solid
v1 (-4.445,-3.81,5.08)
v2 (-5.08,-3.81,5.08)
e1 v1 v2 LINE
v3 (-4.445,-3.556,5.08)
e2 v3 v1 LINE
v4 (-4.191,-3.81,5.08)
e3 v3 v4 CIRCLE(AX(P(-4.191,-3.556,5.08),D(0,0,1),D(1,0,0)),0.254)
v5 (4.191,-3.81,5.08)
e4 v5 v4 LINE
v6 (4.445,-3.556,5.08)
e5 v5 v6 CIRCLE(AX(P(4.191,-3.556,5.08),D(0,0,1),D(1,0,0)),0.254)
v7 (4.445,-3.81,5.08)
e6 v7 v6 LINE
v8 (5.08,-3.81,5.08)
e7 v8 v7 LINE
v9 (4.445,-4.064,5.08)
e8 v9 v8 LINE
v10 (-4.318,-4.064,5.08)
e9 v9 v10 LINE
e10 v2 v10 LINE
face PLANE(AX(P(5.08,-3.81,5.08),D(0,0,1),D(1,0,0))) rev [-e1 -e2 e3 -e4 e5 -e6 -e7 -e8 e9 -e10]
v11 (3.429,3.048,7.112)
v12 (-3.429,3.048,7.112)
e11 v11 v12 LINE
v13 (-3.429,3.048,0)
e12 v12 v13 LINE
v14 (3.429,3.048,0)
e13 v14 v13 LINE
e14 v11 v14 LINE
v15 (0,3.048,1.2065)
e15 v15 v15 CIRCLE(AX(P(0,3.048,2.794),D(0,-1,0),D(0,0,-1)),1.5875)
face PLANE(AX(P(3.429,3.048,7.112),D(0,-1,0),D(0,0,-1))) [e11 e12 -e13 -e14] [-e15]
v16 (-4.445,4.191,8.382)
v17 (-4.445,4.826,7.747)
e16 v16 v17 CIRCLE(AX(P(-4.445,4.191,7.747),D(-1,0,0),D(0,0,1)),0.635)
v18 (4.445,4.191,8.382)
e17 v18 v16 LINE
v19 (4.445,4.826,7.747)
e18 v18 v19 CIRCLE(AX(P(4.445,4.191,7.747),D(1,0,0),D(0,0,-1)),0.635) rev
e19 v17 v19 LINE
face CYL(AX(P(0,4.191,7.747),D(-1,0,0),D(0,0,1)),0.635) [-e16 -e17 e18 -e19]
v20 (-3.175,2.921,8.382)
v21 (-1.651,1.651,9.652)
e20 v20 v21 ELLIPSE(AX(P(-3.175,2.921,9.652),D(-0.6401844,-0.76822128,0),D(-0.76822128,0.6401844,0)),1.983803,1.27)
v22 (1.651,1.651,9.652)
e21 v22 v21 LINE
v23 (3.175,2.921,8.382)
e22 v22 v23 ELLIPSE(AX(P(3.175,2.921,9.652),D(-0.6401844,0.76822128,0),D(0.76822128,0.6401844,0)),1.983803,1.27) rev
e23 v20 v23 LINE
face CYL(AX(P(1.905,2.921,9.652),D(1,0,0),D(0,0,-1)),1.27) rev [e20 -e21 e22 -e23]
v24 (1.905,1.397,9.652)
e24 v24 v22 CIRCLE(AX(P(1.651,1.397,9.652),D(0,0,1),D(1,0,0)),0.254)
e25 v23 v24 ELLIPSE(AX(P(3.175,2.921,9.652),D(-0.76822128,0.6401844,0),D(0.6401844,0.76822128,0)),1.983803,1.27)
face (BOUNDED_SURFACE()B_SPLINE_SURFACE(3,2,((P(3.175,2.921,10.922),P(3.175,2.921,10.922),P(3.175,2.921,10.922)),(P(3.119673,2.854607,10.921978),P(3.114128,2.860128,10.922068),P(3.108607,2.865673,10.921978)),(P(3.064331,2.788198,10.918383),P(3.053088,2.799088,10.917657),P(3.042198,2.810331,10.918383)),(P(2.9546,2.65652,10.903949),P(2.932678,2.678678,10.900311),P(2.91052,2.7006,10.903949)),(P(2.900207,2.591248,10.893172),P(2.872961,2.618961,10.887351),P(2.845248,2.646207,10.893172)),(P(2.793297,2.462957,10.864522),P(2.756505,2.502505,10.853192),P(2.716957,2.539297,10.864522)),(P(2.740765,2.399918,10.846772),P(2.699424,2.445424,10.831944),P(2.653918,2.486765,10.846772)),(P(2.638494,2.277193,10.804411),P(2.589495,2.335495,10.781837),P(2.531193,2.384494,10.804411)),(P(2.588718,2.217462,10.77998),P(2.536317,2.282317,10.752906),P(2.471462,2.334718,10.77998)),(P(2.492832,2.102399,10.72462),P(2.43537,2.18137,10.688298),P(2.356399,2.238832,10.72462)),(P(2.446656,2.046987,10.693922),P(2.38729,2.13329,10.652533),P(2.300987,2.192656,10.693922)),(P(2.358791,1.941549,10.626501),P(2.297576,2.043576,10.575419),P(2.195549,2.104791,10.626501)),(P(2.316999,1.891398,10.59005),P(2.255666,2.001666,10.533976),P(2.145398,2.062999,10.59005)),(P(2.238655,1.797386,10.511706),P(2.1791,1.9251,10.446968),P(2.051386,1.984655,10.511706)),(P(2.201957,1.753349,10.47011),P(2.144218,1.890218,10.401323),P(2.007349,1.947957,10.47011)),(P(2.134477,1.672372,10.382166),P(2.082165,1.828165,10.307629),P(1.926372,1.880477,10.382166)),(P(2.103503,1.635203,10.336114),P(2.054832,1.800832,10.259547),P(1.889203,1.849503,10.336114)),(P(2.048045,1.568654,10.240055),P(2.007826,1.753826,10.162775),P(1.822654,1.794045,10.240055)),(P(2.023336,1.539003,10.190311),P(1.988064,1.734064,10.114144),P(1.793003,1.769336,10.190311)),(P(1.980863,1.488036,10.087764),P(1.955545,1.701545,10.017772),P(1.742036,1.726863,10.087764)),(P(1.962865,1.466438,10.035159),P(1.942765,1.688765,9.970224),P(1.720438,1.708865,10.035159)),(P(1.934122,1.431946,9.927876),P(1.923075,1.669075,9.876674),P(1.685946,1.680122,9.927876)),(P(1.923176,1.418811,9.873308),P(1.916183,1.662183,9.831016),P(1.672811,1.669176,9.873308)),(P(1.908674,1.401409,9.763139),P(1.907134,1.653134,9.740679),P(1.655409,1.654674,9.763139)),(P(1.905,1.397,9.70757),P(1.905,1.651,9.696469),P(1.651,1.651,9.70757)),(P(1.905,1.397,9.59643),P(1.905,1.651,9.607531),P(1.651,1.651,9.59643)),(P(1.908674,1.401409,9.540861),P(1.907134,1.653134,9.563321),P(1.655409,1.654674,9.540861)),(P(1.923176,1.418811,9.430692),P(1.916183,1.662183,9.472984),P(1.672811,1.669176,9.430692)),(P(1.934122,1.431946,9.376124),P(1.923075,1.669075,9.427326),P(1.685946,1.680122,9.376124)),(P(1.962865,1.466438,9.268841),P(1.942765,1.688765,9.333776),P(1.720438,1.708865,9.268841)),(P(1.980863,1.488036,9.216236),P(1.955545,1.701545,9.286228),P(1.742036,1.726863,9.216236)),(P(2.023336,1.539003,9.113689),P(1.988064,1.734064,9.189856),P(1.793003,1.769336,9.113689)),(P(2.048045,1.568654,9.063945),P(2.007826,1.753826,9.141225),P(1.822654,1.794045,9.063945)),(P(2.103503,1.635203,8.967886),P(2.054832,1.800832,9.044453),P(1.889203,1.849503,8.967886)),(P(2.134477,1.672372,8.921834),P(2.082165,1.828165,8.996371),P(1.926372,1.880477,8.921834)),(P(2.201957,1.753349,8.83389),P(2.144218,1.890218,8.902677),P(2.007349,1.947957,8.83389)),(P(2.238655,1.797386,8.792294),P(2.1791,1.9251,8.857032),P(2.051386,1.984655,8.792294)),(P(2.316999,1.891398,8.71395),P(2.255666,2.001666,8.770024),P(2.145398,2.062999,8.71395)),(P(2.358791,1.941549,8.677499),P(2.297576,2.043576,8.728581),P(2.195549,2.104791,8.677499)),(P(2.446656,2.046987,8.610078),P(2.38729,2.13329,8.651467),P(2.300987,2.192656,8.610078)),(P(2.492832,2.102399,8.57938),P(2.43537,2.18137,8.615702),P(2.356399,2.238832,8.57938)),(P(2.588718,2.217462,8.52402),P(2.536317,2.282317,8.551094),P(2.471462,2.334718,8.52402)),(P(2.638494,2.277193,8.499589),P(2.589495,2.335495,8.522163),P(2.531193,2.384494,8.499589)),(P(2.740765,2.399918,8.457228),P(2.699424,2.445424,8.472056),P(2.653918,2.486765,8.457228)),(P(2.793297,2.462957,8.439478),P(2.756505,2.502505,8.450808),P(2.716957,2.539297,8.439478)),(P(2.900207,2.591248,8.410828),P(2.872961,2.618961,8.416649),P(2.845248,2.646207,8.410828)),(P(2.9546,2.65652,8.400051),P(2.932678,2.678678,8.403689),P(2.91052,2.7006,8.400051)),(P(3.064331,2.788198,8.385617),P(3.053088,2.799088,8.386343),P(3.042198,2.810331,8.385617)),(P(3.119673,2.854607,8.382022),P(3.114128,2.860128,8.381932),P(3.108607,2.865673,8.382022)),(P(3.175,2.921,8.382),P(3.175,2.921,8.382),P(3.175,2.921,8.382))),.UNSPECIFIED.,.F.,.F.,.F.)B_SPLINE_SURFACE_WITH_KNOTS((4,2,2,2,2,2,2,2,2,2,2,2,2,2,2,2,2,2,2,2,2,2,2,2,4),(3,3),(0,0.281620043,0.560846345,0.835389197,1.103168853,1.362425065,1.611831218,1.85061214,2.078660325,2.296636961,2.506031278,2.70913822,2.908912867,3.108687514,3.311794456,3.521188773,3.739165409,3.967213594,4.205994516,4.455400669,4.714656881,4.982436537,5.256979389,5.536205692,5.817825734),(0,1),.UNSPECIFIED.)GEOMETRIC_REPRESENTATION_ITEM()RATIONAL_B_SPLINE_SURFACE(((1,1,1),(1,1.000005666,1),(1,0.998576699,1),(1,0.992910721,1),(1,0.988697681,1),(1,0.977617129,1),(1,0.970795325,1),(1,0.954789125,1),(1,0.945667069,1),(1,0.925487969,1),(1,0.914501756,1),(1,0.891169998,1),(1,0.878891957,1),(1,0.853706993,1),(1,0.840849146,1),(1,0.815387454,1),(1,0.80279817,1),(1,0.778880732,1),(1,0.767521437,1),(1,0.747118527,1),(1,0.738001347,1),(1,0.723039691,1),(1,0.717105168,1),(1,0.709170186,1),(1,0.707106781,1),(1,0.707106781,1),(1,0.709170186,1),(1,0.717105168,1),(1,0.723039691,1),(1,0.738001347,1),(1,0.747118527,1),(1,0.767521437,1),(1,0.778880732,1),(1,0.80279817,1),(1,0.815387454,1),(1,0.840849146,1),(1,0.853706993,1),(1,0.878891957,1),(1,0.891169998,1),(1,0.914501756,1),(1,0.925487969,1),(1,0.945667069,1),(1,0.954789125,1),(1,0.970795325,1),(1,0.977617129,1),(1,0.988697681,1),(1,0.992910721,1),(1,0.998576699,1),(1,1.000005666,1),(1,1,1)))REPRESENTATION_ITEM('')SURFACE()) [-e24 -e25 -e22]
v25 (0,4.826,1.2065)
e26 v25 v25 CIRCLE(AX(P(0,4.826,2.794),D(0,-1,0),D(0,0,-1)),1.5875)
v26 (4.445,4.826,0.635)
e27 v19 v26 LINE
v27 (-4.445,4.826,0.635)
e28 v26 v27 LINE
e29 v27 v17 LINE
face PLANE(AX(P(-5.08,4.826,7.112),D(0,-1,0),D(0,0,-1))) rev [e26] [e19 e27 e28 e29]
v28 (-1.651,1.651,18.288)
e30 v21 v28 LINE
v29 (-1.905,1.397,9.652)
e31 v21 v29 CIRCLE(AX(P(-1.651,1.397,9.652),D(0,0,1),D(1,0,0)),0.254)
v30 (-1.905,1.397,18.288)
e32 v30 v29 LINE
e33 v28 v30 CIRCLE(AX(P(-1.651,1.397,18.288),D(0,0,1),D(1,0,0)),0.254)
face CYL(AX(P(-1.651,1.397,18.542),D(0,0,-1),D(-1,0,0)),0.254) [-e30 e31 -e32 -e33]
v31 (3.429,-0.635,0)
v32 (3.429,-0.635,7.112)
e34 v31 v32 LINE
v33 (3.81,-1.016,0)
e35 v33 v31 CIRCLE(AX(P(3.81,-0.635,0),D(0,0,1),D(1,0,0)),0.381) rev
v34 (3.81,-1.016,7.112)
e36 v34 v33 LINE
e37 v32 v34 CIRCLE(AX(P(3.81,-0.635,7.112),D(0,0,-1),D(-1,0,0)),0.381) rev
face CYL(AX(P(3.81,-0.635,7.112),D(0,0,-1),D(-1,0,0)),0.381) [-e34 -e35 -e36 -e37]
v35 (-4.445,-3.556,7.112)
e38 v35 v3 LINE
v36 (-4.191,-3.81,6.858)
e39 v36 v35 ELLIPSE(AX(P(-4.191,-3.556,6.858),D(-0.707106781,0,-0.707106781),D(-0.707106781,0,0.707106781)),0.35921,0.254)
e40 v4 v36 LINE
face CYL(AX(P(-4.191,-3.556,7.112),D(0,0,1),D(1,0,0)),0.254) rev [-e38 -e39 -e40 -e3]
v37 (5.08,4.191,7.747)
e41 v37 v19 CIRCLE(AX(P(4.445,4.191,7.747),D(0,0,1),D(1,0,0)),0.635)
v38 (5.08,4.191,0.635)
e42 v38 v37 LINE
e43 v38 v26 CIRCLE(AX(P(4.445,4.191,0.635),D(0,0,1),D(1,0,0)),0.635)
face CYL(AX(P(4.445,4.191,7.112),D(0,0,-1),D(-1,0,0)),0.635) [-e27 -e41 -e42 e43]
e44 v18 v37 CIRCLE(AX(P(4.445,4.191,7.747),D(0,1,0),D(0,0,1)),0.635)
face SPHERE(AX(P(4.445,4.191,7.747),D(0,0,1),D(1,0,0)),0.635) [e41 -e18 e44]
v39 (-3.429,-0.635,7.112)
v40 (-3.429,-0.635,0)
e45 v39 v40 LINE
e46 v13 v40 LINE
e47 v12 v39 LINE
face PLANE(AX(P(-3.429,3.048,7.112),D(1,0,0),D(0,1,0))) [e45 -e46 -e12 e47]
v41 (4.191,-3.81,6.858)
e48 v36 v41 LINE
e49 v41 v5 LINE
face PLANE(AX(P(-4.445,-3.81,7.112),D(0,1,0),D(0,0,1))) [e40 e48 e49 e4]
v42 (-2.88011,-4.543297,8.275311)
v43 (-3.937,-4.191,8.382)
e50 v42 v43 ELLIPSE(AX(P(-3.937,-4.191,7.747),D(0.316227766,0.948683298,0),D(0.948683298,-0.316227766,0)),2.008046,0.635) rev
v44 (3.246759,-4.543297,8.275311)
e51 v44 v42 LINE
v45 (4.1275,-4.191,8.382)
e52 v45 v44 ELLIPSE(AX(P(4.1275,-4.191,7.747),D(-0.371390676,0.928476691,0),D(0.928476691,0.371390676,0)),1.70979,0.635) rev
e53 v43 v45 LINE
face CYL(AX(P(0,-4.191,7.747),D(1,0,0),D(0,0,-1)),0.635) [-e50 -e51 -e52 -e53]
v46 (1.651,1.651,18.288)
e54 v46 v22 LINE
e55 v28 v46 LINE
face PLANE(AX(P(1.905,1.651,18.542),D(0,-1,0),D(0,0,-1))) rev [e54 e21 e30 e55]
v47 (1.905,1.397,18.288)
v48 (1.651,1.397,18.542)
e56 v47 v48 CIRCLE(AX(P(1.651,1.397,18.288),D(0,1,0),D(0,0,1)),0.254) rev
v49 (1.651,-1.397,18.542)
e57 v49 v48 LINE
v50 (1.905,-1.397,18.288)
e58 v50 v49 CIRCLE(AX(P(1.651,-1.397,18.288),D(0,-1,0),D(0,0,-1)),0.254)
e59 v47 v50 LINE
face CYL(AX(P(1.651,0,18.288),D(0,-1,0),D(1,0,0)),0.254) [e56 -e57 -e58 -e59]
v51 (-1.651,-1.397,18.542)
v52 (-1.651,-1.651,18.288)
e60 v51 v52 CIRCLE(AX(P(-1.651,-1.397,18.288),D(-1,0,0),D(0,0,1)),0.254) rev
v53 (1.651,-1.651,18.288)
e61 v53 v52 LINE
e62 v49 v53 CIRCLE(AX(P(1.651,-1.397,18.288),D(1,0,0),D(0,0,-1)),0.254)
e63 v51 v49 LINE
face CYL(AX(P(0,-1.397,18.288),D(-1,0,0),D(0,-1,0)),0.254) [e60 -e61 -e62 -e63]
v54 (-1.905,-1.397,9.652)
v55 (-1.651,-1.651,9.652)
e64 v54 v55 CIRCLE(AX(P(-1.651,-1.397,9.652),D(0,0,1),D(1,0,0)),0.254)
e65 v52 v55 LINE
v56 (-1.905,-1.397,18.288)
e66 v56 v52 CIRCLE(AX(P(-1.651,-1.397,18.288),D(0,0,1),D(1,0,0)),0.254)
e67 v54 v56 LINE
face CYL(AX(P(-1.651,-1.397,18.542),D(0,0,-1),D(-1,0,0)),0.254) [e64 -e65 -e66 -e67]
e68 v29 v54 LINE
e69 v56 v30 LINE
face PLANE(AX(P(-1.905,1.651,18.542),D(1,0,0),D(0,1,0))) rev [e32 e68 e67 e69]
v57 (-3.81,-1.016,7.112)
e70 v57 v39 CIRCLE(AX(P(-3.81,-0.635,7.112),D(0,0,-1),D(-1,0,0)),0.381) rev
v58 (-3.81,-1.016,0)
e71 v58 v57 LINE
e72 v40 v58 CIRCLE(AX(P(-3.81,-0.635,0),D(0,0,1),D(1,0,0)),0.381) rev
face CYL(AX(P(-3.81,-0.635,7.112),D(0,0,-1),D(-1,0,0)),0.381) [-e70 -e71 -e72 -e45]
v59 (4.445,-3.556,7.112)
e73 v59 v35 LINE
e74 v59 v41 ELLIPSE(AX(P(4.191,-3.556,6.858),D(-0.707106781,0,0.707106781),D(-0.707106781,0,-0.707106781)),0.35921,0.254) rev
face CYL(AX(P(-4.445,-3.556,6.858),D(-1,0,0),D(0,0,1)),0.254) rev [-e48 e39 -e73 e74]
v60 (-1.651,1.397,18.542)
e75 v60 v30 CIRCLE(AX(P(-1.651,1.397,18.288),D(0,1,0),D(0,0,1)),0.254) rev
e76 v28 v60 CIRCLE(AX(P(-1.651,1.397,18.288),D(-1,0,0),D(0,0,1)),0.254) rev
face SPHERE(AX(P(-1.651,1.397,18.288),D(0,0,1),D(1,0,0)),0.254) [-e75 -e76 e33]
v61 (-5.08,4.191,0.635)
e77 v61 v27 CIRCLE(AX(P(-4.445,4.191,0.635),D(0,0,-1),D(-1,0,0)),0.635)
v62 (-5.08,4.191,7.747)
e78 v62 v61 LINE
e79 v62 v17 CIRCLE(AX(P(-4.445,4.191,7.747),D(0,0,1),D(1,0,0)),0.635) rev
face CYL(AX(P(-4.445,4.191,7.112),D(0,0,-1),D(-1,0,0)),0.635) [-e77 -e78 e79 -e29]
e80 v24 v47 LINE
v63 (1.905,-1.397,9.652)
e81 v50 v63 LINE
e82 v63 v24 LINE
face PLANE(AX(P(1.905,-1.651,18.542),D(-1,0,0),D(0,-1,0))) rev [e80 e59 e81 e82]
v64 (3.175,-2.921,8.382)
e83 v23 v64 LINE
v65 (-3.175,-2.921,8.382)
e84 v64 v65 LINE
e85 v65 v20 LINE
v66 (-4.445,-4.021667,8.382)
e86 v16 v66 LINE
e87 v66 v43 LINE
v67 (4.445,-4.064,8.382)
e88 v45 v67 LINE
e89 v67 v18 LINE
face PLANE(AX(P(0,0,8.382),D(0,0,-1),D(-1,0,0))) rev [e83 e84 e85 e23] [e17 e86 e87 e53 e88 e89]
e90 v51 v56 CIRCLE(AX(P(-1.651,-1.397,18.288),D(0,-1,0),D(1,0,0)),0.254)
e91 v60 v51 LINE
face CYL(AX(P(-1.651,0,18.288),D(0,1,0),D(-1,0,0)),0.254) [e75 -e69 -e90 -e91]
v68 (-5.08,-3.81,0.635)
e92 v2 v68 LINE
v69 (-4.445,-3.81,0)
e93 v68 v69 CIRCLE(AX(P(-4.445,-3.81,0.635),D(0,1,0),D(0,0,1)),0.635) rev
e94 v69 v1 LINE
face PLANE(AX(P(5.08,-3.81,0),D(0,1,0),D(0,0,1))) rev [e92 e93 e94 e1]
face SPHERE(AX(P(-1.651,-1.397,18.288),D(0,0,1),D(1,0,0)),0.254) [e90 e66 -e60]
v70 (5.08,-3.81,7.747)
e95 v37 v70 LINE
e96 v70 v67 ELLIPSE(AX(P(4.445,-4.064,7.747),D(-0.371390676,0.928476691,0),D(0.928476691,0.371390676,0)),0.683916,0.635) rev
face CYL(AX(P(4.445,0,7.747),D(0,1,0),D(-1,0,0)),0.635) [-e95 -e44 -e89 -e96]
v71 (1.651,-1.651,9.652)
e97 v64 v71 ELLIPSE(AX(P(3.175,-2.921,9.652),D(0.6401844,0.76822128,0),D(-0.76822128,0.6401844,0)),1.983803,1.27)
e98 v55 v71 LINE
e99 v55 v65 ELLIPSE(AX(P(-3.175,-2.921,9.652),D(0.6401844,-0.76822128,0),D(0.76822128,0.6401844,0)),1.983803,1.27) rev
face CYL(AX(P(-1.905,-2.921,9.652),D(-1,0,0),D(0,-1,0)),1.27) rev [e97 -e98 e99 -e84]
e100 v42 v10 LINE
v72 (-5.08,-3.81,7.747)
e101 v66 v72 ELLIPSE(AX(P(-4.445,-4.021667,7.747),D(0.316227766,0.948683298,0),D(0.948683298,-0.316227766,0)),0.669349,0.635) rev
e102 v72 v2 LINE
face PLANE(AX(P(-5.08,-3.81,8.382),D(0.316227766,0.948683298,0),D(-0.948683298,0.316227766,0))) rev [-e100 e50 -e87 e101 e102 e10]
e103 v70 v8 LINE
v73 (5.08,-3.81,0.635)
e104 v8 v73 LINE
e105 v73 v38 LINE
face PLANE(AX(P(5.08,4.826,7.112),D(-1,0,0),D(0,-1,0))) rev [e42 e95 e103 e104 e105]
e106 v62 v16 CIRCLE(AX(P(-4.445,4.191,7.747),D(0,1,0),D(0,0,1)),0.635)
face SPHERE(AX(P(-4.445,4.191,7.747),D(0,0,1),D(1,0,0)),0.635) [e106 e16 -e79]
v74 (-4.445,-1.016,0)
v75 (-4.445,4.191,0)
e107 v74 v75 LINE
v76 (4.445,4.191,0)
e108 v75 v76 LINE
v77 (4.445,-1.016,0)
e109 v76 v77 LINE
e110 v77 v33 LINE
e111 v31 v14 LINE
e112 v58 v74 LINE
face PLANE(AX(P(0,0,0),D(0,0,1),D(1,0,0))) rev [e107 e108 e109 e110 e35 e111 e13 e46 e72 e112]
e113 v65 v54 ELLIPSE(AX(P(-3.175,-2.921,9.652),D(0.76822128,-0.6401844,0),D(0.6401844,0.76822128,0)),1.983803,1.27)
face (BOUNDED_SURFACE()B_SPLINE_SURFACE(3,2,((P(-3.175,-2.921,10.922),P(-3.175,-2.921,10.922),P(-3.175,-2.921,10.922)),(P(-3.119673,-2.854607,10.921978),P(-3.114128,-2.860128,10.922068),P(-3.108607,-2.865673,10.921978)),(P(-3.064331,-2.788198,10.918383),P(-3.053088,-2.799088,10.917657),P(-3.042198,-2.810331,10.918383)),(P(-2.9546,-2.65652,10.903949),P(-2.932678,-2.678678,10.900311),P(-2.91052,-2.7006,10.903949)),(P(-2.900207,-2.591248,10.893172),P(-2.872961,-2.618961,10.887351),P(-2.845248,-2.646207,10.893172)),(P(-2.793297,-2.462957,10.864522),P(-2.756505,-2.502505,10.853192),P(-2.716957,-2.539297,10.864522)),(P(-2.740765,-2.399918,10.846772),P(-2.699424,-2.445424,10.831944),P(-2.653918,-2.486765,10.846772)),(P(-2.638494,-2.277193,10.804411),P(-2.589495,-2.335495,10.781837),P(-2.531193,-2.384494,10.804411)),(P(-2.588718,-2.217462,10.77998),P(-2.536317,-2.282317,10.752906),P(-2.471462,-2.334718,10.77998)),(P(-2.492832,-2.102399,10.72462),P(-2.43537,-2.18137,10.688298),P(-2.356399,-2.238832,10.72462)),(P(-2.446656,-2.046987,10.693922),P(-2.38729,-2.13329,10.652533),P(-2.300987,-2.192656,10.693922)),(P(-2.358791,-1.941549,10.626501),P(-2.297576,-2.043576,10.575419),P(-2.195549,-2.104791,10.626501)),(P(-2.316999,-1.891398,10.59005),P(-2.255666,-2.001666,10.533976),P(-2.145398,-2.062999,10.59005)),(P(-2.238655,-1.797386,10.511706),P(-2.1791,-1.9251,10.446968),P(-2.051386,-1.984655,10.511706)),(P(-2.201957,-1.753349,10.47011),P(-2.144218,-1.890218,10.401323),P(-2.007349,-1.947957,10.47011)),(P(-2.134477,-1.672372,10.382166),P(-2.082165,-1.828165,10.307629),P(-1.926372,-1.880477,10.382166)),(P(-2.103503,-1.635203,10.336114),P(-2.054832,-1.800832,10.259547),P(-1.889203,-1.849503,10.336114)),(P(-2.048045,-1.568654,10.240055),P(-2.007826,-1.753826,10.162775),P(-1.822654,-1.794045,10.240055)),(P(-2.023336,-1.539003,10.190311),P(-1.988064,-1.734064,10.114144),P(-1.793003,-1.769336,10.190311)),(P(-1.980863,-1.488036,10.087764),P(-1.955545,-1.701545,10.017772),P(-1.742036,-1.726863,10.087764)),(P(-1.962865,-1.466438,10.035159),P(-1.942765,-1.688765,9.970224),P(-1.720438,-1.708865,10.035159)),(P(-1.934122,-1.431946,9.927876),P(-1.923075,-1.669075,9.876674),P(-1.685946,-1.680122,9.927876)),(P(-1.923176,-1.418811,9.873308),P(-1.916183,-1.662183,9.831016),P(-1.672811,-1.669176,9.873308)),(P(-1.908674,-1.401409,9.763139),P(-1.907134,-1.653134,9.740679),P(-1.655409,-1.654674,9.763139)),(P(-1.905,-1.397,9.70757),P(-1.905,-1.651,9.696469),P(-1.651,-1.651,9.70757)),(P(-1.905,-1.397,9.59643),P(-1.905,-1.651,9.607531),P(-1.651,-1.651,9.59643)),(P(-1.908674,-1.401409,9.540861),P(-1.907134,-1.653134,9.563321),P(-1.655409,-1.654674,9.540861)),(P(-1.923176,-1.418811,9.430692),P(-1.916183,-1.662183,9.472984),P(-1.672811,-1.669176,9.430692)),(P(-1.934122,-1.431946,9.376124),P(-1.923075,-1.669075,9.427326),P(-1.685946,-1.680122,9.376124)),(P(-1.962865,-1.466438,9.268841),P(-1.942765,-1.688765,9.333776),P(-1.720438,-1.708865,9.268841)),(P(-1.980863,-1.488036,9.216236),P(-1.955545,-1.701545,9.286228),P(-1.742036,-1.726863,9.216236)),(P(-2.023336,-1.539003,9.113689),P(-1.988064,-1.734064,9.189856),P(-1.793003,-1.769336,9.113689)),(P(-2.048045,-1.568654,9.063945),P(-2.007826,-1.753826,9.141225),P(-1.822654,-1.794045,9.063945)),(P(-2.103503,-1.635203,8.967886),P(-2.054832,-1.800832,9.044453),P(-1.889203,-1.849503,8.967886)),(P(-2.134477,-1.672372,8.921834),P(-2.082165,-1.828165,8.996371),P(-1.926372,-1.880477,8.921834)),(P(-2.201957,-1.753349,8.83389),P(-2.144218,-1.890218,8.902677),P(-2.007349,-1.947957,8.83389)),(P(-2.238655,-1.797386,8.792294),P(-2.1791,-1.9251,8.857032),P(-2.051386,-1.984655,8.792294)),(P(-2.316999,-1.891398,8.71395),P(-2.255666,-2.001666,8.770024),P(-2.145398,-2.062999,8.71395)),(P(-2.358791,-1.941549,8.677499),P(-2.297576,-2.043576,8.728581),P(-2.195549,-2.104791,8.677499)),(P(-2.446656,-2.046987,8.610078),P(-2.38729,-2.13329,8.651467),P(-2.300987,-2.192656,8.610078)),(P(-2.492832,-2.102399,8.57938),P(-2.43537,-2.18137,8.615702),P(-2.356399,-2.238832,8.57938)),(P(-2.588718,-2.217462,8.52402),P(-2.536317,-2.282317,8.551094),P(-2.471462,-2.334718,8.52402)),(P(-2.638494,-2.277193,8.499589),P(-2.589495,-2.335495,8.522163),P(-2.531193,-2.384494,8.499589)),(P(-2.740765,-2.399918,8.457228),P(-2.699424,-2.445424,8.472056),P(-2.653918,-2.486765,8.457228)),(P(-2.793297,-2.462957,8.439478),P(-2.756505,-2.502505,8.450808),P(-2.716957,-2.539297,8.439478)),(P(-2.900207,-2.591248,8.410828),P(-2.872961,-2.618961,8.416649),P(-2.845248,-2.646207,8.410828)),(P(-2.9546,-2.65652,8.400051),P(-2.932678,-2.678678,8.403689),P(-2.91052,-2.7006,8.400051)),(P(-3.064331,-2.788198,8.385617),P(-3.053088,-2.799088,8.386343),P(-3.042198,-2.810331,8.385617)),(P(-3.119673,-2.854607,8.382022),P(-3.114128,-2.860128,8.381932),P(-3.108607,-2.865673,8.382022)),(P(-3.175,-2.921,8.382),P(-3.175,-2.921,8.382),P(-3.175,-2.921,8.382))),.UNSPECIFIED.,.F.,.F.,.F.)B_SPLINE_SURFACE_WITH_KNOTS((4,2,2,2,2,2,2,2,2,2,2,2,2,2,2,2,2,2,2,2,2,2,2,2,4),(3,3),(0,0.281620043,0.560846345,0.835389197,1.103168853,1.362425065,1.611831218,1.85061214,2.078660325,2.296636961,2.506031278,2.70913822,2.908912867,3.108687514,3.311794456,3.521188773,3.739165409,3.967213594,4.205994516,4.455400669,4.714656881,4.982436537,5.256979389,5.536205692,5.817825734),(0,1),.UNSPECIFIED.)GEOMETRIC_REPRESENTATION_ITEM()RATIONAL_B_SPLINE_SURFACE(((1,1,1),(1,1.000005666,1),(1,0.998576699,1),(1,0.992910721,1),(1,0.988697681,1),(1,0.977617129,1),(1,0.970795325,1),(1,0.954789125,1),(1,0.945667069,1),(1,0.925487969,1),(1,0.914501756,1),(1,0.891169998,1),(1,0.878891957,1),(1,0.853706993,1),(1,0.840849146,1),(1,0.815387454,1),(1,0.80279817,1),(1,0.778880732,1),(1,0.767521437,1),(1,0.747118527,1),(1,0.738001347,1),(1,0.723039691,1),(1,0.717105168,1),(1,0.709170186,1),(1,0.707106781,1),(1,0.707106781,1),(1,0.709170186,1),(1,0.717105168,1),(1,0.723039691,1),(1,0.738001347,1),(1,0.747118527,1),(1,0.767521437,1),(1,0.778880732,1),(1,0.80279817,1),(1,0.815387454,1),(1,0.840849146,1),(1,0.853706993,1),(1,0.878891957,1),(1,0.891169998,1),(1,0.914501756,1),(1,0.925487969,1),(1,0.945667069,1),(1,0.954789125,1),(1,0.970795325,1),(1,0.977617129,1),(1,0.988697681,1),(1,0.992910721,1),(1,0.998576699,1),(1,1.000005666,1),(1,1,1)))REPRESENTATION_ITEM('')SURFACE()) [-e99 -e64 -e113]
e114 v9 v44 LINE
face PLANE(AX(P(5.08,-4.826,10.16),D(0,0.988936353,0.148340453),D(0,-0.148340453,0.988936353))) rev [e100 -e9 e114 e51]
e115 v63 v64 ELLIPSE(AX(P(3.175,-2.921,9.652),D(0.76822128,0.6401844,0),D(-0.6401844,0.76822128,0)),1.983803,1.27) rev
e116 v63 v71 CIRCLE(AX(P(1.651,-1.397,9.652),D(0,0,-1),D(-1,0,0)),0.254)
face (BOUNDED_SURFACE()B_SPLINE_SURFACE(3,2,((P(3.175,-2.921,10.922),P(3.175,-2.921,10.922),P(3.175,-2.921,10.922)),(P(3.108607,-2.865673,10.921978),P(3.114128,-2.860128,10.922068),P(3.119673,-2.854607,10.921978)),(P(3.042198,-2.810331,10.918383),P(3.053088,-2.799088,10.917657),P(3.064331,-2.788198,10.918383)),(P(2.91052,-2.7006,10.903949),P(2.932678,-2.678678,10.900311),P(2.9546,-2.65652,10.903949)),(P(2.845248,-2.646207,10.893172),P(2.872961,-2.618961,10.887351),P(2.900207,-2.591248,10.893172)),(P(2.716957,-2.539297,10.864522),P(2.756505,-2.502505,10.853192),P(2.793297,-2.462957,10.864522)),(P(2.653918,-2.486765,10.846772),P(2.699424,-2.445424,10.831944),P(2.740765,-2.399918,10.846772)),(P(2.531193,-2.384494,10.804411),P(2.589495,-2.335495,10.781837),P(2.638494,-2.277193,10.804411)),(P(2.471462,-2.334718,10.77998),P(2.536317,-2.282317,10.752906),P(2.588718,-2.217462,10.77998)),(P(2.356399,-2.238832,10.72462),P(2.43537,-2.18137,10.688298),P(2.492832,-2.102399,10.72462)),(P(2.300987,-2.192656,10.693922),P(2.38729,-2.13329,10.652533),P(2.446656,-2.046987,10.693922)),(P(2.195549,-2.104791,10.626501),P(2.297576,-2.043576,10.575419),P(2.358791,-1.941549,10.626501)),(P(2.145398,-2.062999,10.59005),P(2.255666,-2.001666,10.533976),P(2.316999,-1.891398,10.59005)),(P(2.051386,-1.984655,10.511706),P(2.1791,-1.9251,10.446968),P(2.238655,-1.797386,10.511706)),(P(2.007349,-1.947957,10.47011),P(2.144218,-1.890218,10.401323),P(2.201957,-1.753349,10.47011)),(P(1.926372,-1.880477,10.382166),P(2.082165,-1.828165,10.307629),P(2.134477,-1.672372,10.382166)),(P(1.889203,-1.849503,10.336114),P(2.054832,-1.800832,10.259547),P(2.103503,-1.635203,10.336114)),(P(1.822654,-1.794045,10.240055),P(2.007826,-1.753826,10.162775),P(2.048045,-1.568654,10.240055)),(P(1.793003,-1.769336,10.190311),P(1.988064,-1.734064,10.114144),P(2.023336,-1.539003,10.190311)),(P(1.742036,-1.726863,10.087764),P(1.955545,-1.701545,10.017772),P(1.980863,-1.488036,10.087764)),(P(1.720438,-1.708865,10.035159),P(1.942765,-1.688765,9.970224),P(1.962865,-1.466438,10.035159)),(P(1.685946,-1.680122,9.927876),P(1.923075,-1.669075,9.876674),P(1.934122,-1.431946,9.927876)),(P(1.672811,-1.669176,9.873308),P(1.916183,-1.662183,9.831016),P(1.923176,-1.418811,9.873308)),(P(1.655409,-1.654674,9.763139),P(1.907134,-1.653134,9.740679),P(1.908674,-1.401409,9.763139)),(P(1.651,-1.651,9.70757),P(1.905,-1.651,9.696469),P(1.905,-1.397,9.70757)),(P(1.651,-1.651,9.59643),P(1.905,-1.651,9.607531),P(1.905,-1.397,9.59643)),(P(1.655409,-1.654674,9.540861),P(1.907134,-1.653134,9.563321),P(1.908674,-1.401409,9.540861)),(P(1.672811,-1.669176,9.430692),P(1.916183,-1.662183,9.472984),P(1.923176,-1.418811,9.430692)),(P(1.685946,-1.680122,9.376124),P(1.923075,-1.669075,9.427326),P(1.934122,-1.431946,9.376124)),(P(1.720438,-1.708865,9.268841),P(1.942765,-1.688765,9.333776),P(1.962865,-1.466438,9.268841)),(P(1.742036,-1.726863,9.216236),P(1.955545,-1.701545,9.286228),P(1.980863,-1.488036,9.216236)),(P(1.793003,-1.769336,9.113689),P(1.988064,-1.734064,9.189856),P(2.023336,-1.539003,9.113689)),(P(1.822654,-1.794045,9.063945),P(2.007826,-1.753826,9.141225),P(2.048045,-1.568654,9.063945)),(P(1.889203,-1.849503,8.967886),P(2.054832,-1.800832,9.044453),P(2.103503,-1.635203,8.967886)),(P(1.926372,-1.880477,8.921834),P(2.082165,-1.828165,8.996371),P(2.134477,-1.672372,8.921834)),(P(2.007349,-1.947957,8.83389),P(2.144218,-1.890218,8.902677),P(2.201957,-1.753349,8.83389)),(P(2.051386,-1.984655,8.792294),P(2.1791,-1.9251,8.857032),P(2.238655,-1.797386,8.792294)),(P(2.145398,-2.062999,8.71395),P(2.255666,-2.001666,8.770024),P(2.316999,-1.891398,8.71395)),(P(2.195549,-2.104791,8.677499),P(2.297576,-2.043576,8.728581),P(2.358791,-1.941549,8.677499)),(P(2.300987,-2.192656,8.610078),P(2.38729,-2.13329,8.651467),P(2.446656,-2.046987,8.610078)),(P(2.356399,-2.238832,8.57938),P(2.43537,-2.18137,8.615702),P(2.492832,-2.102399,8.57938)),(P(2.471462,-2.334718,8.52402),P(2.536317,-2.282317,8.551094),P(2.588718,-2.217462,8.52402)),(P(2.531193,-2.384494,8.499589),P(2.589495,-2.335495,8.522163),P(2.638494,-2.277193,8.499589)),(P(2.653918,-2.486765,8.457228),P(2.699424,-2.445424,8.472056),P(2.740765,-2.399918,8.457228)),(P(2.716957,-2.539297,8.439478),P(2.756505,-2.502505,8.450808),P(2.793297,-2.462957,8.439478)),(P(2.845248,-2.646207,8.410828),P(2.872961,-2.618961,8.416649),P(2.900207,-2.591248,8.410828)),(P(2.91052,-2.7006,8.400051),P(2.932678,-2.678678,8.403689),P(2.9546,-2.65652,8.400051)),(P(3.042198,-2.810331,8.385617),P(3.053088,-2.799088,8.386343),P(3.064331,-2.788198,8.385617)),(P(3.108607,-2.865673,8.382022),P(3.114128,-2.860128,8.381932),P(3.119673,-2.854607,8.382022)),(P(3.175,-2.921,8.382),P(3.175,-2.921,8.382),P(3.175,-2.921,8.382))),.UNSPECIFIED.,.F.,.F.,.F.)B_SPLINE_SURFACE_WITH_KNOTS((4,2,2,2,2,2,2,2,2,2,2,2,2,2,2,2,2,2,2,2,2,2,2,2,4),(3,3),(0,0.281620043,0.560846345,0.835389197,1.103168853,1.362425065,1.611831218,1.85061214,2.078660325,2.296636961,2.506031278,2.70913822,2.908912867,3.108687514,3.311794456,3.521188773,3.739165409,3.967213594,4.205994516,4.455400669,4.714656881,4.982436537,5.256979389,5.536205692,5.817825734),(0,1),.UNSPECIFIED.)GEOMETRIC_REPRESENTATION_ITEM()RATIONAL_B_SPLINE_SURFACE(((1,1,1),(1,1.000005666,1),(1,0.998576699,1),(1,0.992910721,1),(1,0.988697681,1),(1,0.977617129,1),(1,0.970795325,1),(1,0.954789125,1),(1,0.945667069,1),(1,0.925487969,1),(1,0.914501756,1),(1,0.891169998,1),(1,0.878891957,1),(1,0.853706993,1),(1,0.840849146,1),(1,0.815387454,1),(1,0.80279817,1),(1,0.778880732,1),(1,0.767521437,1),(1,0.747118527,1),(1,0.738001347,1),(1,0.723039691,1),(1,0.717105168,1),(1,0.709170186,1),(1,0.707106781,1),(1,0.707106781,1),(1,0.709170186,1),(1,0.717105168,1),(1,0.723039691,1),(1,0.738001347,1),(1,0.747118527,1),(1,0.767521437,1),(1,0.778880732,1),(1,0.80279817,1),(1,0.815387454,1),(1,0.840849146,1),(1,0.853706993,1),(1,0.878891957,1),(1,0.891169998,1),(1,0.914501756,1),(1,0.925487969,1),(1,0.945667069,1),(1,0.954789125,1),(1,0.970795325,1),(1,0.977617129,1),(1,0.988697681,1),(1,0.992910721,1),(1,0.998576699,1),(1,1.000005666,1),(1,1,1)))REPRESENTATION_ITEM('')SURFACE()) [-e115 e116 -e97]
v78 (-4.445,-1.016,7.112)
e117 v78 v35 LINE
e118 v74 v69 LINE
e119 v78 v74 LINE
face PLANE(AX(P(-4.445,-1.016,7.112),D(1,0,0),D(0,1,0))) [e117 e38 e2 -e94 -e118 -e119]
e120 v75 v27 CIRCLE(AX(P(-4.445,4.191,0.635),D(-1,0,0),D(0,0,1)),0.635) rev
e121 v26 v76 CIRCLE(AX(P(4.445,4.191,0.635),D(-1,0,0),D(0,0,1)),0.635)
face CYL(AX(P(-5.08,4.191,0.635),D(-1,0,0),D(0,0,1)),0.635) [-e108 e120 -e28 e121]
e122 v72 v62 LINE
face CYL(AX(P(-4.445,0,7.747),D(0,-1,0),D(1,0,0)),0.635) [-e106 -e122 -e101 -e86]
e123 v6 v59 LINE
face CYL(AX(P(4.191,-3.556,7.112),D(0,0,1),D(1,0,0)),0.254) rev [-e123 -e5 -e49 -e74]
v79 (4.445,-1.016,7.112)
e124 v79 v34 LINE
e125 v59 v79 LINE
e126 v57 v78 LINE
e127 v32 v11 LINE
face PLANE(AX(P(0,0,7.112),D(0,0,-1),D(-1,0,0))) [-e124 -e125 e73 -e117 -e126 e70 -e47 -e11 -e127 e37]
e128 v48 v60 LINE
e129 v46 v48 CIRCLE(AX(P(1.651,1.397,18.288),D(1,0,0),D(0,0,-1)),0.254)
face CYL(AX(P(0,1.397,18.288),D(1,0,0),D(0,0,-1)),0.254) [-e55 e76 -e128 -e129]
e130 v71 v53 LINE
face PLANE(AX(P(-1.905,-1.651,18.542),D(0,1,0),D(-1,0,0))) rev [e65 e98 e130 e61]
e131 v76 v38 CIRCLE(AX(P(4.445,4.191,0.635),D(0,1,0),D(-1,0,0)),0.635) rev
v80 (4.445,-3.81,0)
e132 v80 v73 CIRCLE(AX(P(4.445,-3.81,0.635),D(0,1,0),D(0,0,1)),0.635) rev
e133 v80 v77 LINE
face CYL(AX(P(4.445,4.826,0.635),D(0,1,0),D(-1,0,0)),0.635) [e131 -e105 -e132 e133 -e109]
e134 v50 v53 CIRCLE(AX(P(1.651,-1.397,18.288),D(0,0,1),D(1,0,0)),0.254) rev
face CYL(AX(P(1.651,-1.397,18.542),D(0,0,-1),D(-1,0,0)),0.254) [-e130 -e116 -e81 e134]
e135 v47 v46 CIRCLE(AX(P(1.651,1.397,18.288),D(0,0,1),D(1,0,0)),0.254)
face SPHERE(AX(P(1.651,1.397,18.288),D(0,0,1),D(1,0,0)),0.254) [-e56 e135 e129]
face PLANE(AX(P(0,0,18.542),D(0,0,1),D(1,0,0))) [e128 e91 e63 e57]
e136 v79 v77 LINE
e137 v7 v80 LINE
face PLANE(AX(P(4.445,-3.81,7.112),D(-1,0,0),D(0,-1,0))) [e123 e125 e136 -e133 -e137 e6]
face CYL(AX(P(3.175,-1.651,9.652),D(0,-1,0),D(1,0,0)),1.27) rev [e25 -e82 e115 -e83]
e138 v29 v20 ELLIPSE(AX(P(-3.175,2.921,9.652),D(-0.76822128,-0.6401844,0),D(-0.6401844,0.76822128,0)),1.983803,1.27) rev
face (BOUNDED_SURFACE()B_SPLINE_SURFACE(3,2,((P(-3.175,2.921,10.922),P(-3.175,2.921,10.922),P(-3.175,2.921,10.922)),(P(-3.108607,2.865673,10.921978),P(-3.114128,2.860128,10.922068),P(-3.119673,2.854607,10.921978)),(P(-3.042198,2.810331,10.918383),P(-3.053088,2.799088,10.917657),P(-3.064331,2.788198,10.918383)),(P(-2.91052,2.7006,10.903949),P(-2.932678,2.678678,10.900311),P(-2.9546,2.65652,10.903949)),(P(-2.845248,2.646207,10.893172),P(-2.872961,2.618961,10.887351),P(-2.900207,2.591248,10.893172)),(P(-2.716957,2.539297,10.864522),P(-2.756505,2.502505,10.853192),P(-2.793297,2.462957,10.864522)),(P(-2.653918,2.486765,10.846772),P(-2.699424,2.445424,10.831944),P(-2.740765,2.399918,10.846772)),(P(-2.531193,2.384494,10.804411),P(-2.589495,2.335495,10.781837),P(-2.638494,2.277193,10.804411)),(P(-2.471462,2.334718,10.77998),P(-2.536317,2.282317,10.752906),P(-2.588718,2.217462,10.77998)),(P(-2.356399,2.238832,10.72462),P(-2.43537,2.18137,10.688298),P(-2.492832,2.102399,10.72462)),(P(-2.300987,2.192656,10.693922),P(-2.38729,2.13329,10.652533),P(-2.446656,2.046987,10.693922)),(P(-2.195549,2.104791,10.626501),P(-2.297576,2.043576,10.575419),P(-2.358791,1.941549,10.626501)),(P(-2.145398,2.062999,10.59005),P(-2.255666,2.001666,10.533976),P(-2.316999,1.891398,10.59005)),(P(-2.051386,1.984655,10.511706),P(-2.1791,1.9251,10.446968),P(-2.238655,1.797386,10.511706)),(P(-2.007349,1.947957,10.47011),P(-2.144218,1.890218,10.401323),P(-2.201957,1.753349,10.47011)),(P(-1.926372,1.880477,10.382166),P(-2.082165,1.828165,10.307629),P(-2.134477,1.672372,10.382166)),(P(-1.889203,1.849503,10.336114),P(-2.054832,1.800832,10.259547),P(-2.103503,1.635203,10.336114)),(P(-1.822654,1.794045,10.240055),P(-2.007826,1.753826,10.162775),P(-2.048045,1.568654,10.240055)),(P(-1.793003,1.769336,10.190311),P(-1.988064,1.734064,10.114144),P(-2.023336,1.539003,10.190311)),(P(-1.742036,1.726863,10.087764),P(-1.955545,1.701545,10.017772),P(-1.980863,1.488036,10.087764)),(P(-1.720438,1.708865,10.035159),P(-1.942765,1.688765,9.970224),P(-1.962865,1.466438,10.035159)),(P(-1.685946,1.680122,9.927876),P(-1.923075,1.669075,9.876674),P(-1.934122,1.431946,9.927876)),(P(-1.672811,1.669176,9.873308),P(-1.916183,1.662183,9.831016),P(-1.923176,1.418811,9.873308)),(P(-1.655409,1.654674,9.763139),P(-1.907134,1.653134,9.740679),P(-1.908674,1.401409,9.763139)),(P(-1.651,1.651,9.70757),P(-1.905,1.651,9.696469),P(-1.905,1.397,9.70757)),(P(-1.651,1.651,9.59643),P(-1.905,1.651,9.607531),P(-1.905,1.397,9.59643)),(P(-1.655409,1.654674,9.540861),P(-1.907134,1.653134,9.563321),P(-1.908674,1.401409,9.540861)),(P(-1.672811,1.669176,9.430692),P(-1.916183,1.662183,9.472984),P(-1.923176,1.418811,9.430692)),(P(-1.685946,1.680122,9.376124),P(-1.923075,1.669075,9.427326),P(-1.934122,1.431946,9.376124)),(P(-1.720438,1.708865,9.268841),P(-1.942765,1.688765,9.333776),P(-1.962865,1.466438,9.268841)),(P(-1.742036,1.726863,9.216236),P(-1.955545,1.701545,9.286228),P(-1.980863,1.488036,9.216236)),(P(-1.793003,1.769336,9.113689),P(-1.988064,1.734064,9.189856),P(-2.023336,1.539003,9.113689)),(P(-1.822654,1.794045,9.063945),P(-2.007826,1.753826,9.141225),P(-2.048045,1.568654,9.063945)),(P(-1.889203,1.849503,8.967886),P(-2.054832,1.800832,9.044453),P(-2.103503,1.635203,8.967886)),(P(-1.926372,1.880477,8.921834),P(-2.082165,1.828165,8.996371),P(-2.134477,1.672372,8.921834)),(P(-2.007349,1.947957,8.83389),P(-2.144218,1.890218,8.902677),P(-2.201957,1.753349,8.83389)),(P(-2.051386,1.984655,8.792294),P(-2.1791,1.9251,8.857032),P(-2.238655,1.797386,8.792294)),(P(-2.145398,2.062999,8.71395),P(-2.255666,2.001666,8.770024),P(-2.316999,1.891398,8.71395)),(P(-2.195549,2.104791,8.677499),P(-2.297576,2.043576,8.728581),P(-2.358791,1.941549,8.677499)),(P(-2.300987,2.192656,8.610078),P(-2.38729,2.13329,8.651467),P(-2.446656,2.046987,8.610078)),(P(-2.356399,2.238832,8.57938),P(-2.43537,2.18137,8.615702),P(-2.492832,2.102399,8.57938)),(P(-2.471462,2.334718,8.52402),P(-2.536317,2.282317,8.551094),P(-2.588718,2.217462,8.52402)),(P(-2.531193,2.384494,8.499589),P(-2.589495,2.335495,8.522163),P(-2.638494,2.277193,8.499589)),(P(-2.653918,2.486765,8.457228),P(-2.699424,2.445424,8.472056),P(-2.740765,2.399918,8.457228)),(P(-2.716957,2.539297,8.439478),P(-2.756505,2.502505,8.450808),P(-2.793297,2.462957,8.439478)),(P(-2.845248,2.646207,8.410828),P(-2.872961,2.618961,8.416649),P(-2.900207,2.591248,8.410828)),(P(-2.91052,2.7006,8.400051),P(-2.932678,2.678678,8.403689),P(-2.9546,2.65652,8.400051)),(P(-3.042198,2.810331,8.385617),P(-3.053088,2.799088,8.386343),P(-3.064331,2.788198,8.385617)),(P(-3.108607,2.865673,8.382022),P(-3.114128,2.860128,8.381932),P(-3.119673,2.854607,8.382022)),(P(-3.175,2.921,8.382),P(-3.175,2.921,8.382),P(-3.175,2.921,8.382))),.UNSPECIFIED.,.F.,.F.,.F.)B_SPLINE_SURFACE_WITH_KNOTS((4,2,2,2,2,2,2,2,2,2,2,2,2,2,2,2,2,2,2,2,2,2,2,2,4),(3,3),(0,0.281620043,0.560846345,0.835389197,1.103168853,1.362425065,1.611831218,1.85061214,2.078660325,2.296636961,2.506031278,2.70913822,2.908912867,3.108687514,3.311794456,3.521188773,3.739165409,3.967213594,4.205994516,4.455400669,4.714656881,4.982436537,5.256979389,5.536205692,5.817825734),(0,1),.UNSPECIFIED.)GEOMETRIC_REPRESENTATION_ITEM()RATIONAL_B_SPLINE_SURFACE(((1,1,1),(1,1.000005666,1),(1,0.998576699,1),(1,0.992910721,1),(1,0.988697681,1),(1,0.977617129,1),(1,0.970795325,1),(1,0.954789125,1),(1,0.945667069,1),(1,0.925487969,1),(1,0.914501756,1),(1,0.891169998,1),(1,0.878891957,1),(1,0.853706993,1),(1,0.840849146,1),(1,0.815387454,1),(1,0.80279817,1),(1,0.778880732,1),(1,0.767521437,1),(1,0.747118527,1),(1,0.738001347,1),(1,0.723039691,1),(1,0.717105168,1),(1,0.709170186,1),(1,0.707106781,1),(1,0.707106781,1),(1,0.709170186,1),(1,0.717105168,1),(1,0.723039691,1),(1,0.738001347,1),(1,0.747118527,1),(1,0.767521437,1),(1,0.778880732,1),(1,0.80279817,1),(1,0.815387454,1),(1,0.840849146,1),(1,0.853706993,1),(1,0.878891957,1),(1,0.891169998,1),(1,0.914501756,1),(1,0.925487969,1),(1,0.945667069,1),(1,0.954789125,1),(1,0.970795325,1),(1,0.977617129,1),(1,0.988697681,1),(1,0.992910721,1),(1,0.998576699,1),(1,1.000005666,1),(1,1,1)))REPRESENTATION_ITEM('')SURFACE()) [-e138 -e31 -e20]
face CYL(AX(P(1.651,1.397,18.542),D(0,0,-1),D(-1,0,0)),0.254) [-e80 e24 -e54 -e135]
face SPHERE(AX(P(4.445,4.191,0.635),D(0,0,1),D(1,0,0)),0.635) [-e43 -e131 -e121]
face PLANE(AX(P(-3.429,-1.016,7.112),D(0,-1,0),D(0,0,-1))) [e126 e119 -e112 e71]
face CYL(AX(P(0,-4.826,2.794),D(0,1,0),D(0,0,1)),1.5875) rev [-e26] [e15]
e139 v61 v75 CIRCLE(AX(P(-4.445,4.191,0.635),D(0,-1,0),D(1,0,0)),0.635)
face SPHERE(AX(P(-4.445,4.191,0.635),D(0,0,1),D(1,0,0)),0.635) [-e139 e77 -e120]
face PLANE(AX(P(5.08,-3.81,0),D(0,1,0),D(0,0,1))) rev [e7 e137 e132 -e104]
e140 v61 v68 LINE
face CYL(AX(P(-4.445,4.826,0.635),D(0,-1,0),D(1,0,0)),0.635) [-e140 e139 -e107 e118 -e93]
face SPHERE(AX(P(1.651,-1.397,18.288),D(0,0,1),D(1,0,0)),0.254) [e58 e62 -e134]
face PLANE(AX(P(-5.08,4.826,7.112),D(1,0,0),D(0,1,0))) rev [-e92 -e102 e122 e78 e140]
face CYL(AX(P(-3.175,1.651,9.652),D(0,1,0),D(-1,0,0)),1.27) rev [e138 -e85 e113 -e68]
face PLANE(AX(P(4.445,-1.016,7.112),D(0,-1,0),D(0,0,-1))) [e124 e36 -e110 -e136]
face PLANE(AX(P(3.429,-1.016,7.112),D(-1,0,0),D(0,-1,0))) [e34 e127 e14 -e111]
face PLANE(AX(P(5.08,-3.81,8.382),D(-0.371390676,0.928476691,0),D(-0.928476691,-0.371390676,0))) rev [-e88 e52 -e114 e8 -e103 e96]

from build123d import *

# Parameters (mm, degrees)
SKETCH1_W               = 10.16
SKETCH1_H               = 9.652
BOSS_EXTRUDE1_DEPTH     = 7.112
CUT_EXTRUDE1_DEPTH      = 14.021061708
CUT_EXTRUDE1_DEPTH_BACK = 14.021061708
SKETCH2_R               = 1.5875
SKETCH7_W               = 10.16
SKETCH7_H               = 9.652
BOSS_EXTRUDE3_DEPTH     = 1.27
FILLET1_R               = 0.635
FILLET3_R               = 0.635
FILLET4_R               = 0.381
CUT_EXTRUDE3_DEPTH      = 14.574749537
CUT_EXTRUDE3_DEPTH_BACK = 14.574749537
FILLET9_R               = 0.254
CUT_EXTRUDE7_DEPTH      = 9.654656319
SKETCH14_W              = 3.81
SKETCH14_H              = 3.302
BOSS_EXTRUDE4_DEPTH     = 10.16
FILLET14_R              = 1.27
FILLET15_R              = 0.254


# Some blends are built 0.0001 mm under size
with BuildPart() as part:
    # Sketch1 → Boss-Extrude1 (new body)
    with BuildSketch(Plane.XY):
        Rectangle(SKETCH1_W, SKETCH1_H)
        Polygon((-4.445, -3.81), (4.445, -3.81), (4.445, -1.016), (3.429, -1.016), (3.429, 3.048), (-3.429, 3.048), (-3.429, -1.016), (-4.445, -1.016), align=None, mode=Mode.SUBTRACT)
    extrude(amount=BOSS_EXTRUDE1_DEPTH)

    # Sketch2 → Cut-Extrude1 (cut, two sides: drawn at the far end of the back side and taken through both)
    with BuildSketch(Plane(origin=(0, 4.826, 0), x_dir=(1, 0, 0), z_dir=(0, 1, 0)).offset(-CUT_EXTRUDE1_DEPTH_BACK)):
        with Locations(Location((0, -2.794, 0), (0, 0, 90))):
            Circle(SKETCH2_R)
    extrude(amount=CUT_EXTRUDE1_DEPTH + CUT_EXTRUDE1_DEPTH_BACK, mode=Mode.SUBTRACT)

    # Sketch7 → Boss-Extrude3 (add)
    with BuildSketch(Plane.XY.offset(7.112)):
        Rectangle(SKETCH7_W, SKETCH7_H)
    extrude(amount=BOSS_EXTRUDE3_DEPTH)

    # Fillet1
    fillet1_edges = [part.edges().sort_by_distance(p)[0] for p in [
        (-5.08, 0, 0),
        (0, 4.826, 0),
        (5.08, 0, 0),
    ]]
    fillet(fillet1_edges, radius=FILLET1_R - 0.0001)  # a hair under: the kernel refuses the full size

    # Fillet3
    # the kernel refuses this fillet: 0.635 mm, written as the material it takes off along each edge
    with BuildSketch(Plane(origin=(4.445, 4.191, 0), x_dir=(0, 1, 0), z_dir=(-1, 0, 0))) as fillet3_piece_1:
        with BuildLine():
            CenterArc((0.0001, -0.6349), 0.6349, 0, 90)
            Line((0.635, -0.6349), (0.635, 0))
            Line((0.635, 0), (0.0001, 0))
        make_face()
    revolve(axis=Axis((4.445, 4.191, 0), (0, 0, -1)), revolution_arc=90, mode=Mode.SUBTRACT)
    with BuildSketch(Plane(origin=(-4.445, 4.191, 0), x_dir=(-1, 0, 0), z_dir=(0, -1, 0))) as fillet3_piece_2:
        with BuildLine():
            CenterArc((0.0001, -0.6349), 0.6349, 0, 90)
            Line((0.635, -0.6349), (0.635, 0))
            Line((0.635, 0), (0.0001, 0))
        make_face()
    revolve(axis=Axis((-4.445, 4.191, 0), (0, 0, -1)), revolution_arc=90, mode=Mode.SUBTRACT)
    with BuildSketch(Plane(origin=(-4.445, -4.191, 7.747), x_dir=(0, 0, 1), z_dir=(-1, 0, 0))) as fillet3_piece_3_section:
        Polygon((0, 0), (FILLET3_R * 1.02, 0), (FILLET3_R * 1.02, -FILLET3_R * 1.02), (0, -FILLET3_R * 1.02), align=None)
    fillet3_piece_3 = extrude(amount=FILLET3_R * 1.02, mode=Mode.PRIVATE)
    fillet3_piece_3 = fillet3_piece_3 - Plane(origin=(-4.445, -4.191, 7.747), x_dir=(0, 0.7071067811865475, -0.7071067811865475), z_dir=(-1, 0, 0)) * Sphere(FILLET3_R, mode=Mode.PRIVATE)
    add(fillet3_piece_3, mode=Mode.SUBTRACT)
    with BuildSketch(Plane(origin=(-4.445, 4.191, 7.747), x_dir=(-1, 0, 0), z_dir=(0, 1, 0))) as fillet3_piece_4_section:
        Polygon((0, 0), (FILLET3_R * 1.02, 0), (FILLET3_R * 1.02, FILLET3_R * 1.02), (0, FILLET3_R * 1.02), align=None)
    fillet3_piece_4 = extrude(amount=FILLET3_R * 1.02, mode=Mode.PRIVATE)
    fillet3_piece_4 = fillet3_piece_4 - Plane(origin=(-4.445, 4.191, 7.747), x_dir=(0.7071067811865475, 0, -0.7071067811865475), z_dir=(0, 1, 0)) * Sphere(FILLET3_R, mode=Mode.PRIVATE)
    add(fillet3_piece_4, mode=Mode.SUBTRACT)
    with BuildSketch(Plane(origin=(4.445, -4.191, 7.747), x_dir=(1, 0, 0), z_dir=(0, 0, 1))) as fillet3_piece_5_section:
        Polygon((0, 0), (FILLET3_R * 1.02, 0), (FILLET3_R * 1.02, -FILLET3_R * 1.02), (0, -FILLET3_R * 1.02), align=None)
    fillet3_piece_5 = extrude(amount=FILLET3_R * 1.02, mode=Mode.PRIVATE)
    fillet3_piece_5 = fillet3_piece_5 - Plane(origin=(4.445, -4.191, 7.747), x_dir=(-0.7071067811865476, 0.7071067811865475, 0), z_dir=(0, 0, 1)) * Sphere(FILLET3_R, mode=Mode.PRIVATE)
    add(fillet3_piece_5, mode=Mode.SUBTRACT)
    with BuildSketch(Plane(origin=(4.445, 4.191, 7.747), x_dir=(0, 0, 1), z_dir=(0, 1, 0))) as fillet3_piece_6_section:
        Polygon((0, 0), (FILLET3_R * 1.02, 0), (FILLET3_R * 1.02, FILLET3_R * 1.02), (0, FILLET3_R * 1.02), align=None)
    fillet3_piece_6 = extrude(amount=FILLET3_R * 1.02, mode=Mode.PRIVATE)
    fillet3_piece_6 = fillet3_piece_6 - Plane(origin=(4.445, 4.191, 7.747), x_dir=(-0.7071067811865475, 0, -0.7071067811865475), z_dir=(0, 1, 0)) * Sphere(FILLET3_R, mode=Mode.PRIVATE)
    add(fillet3_piece_6, mode=Mode.SUBTRACT)
    with BuildSketch(Plane(origin=(-5.08, -4.191, 8.382), x_dir=(0, 0, -1), z_dir=(0, 1, 0))) as fillet3_piece_7:
        with BuildLine():
            CenterArc((FILLET3_R, -FILLET3_R), FILLET3_R, 90, 90)
            Line((0, -FILLET3_R), (-FILLET3_R * 0.02, -FILLET3_R))
            Line((-FILLET3_R * 0.02, -FILLET3_R), (-FILLET3_R * 0.02, FILLET3_R * 0.02))
            Line((-FILLET3_R * 0.02, FILLET3_R * 0.02), (FILLET3_R, FILLET3_R * 0.02))
            Line((FILLET3_R, FILLET3_R * 0.02), (FILLET3_R, 0))
        make_face()
    extrude(amount=8.382, mode=Mode.SUBTRACT)
    with BuildSketch(Plane(origin=(4.445, -4.826, 8.382), x_dir=(0, 1, 0), z_dir=(-1, 0, 0))) as fillet3_piece_8:
        with BuildLine():
            CenterArc((FILLET3_R, FILLET3_R), FILLET3_R, 180, 90)
            Line((0, FILLET3_R), (-FILLET3_R * 0.02, FILLET3_R))
            Line((-FILLET3_R * 0.02, FILLET3_R), (-FILLET3_R * 0.02, -FILLET3_R * 0.02))
            Line((-FILLET3_R * 0.02, -FILLET3_R * 0.02), (FILLET3_R, -FILLET3_R * 0.02))
            Line((FILLET3_R, -FILLET3_R * 0.02), (FILLET3_R, 0))
        make_face()
    extrude(amount=8.89, mode=Mode.SUBTRACT)
    with BuildSketch(Plane(origin=(5.08, 4.191, 8.382), x_dir=(-1, 0, 0), z_dir=(0, -1, 0))) as fillet3_piece_9:
        with BuildLine():
            CenterArc((FILLET3_R, FILLET3_R), FILLET3_R, 180, 90)
            Line((0, FILLET3_R), (-FILLET3_R * 0.02, FILLET3_R))
            Line((-FILLET3_R * 0.02, FILLET3_R), (-FILLET3_R * 0.02, -FILLET3_R * 0.02))
            Line((-FILLET3_R * 0.02, -FILLET3_R * 0.02), (FILLET3_R, -FILLET3_R * 0.02))
            Line((FILLET3_R, -FILLET3_R * 0.02), (FILLET3_R, 0))
        make_face()
    extrude(amount=8.382, mode=Mode.SUBTRACT)
    with BuildSketch(Plane(origin=(-4.445, 4.826, 8.382), x_dir=(0, 0, -1), z_dir=(1, 0, 0))) as fillet3_piece_10:
        with BuildLine():
            CenterArc((FILLET3_R, -FILLET3_R), FILLET3_R, 90, 90)
            Line((0, -FILLET3_R), (-FILLET3_R * 0.02, -FILLET3_R))
            Line((-FILLET3_R * 0.02, -FILLET3_R), (-FILLET3_R * 0.02, FILLET3_R * 0.02))
            Line((-FILLET3_R * 0.02, FILLET3_R * 0.02), (FILLET3_R, FILLET3_R * 0.02))
            Line((FILLET3_R, FILLET3_R * 0.02), (FILLET3_R, 0))
        make_face()
    extrude(amount=8.89, mode=Mode.SUBTRACT)
    with BuildSketch(Plane(origin=(6.0326, -4.826, 0), x_dir=(0, 0, 1), z_dir=(-1, 0, 0))) as fillet3_piece_11:
        with BuildLine():
            CenterArc((FILLET3_R, FILLET3_R), FILLET3_R, 180, 90)
            Line((0, FILLET3_R), (-FILLET3_R * 0.02, FILLET3_R))
            Line((-FILLET3_R * 0.02, FILLET3_R), (-FILLET3_R * 0.02, -FILLET3_R * 0.02))
            Line((-FILLET3_R * 0.02, -FILLET3_R * 0.02), (FILLET3_R, -FILLET3_R * 0.02))
            Line((FILLET3_R, -FILLET3_R * 0.02), (FILLET3_R, 0))
        make_face()
    extrude(amount=12.0652, mode=Mode.SUBTRACT)
    with BuildSketch(Plane(origin=(4.4451, -4.826, 0.6349), x_dir=(0, 0, -1), z_dir=(-1, 0, 0))) as fillet3_piece_12:
        with BuildLine():
            CenterArc((-0.0001, -0.635), FILLET3_R, 0, 89.990977043)
            Line((0.6349, -0.635), (0.6476, -0.635))
            Line((0.6476, -0.635), (0.6476, 0.0127))
            Line((0.6476, 0.0127), (0, 0.0127))
            Line((0, 0.0127), (0, -8e-09))
        make_face()
    revolve(axis=Axis((4.4451, -4.826, 0.6349), (0, -1, 0)), revolution_arc=90, mode=Mode.SUBTRACT)
    with BuildSketch(Plane(origin=(-4.4451, -4.826, 0.6349), x_dir=(0, 0, -1), z_dir=(1, 0, 0))) as fillet3_piece_13:
        with BuildLine():
            CenterArc((-0.0001, 0.635), FILLET3_R, 270.009022957, 89.990977043)
            Line((0.6349, 0.635), (0.6476, 0.635))
            Line((0.6476, 0.635), (0.6476, -0.0127))
            Line((0.6476, -0.0127), (0, -0.0127))
            Line((0, -0.0127), (0, 8e-09))
        make_face()
    revolve(axis=Axis((-4.4451, -4.826, 0.6349), (0, 1, 0)), revolution_arc=90, mode=Mode.SUBTRACT)
    with BuildSketch(Plane(origin=(5.08, -4.826, 7.747), x_dir=(0, 1, 0), z_dir=(0, 0, -1)), Plane(origin=(-5.08, -4.826, -0.9526), x_dir=(0, 1, 0), z_dir=(0, 0, 1))) as fillet3_piece_14:
        with BuildLine():
            CenterArc((FILLET3_R, -FILLET3_R), FILLET3_R, 90, 90)
            Line((0, -FILLET3_R), (-FILLET3_R * 0.02, -FILLET3_R))
            Line((-FILLET3_R * 0.02, -FILLET3_R), (-FILLET3_R * 0.02, FILLET3_R * 0.02))
            Line((-FILLET3_R * 0.02, FILLET3_R * 0.02), (FILLET3_R, FILLET3_R * 0.02))
            Line((FILLET3_R, FILLET3_R * 0.02), (FILLET3_R, 0))
        make_face()
    extrude(amount=8.6996, mode=Mode.SUBTRACT)
    with BuildSketch(Plane(origin=(-5.08, 4.826, 0), x_dir=(1, 0, 0), z_dir=(0, 0, 1)), Plane(origin=(5.08, 4.826, 7.747), x_dir=(-1, 0, 0), z_dir=(0, 0, -1))) as fillet3_piece_15:
        with BuildLine():
            CenterArc((FILLET3_R, -FILLET3_R), FILLET3_R, 90, 90)
            Line((0, -FILLET3_R), (-FILLET3_R * 0.02, -FILLET3_R))
            Line((-FILLET3_R * 0.02, -FILLET3_R), (-FILLET3_R * 0.02, FILLET3_R * 0.02))
            Line((-FILLET3_R * 0.02, FILLET3_R * 0.02), (FILLET3_R, FILLET3_R * 0.02))
            Line((FILLET3_R, FILLET3_R * 0.02), (FILLET3_R, 0))
        make_face()
    extrude(amount=7.747, mode=Mode.SUBTRACT)

    # Fillet4
    fillet4_edges = [part.edges().sort_by_distance(p)[0] for p in [
        (3.429, -1.016, 3.556),
        (-3.429, -1.016, 3.556),
    ]]
    fillet(fillet4_edges, radius=FILLET4_R)

    # Sketch11 → Cut-Extrude3 (cut, two sides: drawn at the far end of the back side and taken through both)
    with BuildSketch(Plane.ZY.offset(-4.445).offset(-CUT_EXTRUDE3_DEPTH_BACK)):
        Polygon((0, -3.81), (5.08, -3.81), (5.08, -4.064), (10.16, -4.826), (0, -4.826), align=None)
    extrude(amount=CUT_EXTRUDE3_DEPTH + CUT_EXTRUDE3_DEPTH_BACK, mode=Mode.SUBTRACT)

    # Fillet9
    fillet9_edges = [part.edges().sort_by_distance(p)[0] for p in [
        (-4.445, -3.81, 6.096),
        (4.445, -3.81, 6.096),
        (0, -3.81, 7.112),
    ]]
    fillet(fillet9_edges, radius=FILLET9_R)

    # Sketch13 → Cut-Extrude7 (cut, through all)
    with BuildSketch(Plane(origin=(0, 0, 5.08), x_dir=(-1, 0, 0), z_dir=(0, 0, -1))):
        Polygon((-5.08, -3.81), (-5.08, -4.826), (-2.54, -4.826), align=None)
        Polygon((5.08, -3.81), (5.08, -4.826), (2.032, -4.826), align=None)
    extrude(amount=-CUT_EXTRUDE7_DEPTH, mode=Mode.SUBTRACT)

    # Sketch14 → Boss-Extrude4 (add)
    with BuildSketch(Plane.XY.offset(8.382)):
        Rectangle(SKETCH14_W, SKETCH14_H)
    extrude(amount=BOSS_EXTRUDE4_DEPTH)

    # Fillet14
    fillet14_edges = [part.edges().sort_by_distance(p)[0] for p in [
        (0, 1.651, 8.382),
        (-1.905, 0, 8.382),
        (0, -1.651, 8.382),
        (1.905, 0, 8.382),
    ]]
    fillet(fillet14_edges, radius=FILLET14_R)

    # Fillet15
    fillet15_edges = [part.edges().sort_by_distance(p)[0] for p in [
        (1.905, 1.651, 14.097),
        (-1.905, 1.651, 14.097),
        (-1.905, -1.651, 14.097),
        (1.905, -1.651, 14.097),
        (0, 1.651, 18.542),
        (-1.905, 0, 18.542),
        (0, -1.651, 18.542),
        (1.905, 0, 18.542),
        (2.354517888, 2.100517888, 8.682614059),
        (2.354517888, -2.100517888, 8.682614059),
        (-2.354517888, 2.100517888, 8.682614059),
        (-2.354517888, -2.100517888, 8.682614059),
    ]]
    fillet(fillet15_edges, radius=FILLET15_R)


solid = part.part
